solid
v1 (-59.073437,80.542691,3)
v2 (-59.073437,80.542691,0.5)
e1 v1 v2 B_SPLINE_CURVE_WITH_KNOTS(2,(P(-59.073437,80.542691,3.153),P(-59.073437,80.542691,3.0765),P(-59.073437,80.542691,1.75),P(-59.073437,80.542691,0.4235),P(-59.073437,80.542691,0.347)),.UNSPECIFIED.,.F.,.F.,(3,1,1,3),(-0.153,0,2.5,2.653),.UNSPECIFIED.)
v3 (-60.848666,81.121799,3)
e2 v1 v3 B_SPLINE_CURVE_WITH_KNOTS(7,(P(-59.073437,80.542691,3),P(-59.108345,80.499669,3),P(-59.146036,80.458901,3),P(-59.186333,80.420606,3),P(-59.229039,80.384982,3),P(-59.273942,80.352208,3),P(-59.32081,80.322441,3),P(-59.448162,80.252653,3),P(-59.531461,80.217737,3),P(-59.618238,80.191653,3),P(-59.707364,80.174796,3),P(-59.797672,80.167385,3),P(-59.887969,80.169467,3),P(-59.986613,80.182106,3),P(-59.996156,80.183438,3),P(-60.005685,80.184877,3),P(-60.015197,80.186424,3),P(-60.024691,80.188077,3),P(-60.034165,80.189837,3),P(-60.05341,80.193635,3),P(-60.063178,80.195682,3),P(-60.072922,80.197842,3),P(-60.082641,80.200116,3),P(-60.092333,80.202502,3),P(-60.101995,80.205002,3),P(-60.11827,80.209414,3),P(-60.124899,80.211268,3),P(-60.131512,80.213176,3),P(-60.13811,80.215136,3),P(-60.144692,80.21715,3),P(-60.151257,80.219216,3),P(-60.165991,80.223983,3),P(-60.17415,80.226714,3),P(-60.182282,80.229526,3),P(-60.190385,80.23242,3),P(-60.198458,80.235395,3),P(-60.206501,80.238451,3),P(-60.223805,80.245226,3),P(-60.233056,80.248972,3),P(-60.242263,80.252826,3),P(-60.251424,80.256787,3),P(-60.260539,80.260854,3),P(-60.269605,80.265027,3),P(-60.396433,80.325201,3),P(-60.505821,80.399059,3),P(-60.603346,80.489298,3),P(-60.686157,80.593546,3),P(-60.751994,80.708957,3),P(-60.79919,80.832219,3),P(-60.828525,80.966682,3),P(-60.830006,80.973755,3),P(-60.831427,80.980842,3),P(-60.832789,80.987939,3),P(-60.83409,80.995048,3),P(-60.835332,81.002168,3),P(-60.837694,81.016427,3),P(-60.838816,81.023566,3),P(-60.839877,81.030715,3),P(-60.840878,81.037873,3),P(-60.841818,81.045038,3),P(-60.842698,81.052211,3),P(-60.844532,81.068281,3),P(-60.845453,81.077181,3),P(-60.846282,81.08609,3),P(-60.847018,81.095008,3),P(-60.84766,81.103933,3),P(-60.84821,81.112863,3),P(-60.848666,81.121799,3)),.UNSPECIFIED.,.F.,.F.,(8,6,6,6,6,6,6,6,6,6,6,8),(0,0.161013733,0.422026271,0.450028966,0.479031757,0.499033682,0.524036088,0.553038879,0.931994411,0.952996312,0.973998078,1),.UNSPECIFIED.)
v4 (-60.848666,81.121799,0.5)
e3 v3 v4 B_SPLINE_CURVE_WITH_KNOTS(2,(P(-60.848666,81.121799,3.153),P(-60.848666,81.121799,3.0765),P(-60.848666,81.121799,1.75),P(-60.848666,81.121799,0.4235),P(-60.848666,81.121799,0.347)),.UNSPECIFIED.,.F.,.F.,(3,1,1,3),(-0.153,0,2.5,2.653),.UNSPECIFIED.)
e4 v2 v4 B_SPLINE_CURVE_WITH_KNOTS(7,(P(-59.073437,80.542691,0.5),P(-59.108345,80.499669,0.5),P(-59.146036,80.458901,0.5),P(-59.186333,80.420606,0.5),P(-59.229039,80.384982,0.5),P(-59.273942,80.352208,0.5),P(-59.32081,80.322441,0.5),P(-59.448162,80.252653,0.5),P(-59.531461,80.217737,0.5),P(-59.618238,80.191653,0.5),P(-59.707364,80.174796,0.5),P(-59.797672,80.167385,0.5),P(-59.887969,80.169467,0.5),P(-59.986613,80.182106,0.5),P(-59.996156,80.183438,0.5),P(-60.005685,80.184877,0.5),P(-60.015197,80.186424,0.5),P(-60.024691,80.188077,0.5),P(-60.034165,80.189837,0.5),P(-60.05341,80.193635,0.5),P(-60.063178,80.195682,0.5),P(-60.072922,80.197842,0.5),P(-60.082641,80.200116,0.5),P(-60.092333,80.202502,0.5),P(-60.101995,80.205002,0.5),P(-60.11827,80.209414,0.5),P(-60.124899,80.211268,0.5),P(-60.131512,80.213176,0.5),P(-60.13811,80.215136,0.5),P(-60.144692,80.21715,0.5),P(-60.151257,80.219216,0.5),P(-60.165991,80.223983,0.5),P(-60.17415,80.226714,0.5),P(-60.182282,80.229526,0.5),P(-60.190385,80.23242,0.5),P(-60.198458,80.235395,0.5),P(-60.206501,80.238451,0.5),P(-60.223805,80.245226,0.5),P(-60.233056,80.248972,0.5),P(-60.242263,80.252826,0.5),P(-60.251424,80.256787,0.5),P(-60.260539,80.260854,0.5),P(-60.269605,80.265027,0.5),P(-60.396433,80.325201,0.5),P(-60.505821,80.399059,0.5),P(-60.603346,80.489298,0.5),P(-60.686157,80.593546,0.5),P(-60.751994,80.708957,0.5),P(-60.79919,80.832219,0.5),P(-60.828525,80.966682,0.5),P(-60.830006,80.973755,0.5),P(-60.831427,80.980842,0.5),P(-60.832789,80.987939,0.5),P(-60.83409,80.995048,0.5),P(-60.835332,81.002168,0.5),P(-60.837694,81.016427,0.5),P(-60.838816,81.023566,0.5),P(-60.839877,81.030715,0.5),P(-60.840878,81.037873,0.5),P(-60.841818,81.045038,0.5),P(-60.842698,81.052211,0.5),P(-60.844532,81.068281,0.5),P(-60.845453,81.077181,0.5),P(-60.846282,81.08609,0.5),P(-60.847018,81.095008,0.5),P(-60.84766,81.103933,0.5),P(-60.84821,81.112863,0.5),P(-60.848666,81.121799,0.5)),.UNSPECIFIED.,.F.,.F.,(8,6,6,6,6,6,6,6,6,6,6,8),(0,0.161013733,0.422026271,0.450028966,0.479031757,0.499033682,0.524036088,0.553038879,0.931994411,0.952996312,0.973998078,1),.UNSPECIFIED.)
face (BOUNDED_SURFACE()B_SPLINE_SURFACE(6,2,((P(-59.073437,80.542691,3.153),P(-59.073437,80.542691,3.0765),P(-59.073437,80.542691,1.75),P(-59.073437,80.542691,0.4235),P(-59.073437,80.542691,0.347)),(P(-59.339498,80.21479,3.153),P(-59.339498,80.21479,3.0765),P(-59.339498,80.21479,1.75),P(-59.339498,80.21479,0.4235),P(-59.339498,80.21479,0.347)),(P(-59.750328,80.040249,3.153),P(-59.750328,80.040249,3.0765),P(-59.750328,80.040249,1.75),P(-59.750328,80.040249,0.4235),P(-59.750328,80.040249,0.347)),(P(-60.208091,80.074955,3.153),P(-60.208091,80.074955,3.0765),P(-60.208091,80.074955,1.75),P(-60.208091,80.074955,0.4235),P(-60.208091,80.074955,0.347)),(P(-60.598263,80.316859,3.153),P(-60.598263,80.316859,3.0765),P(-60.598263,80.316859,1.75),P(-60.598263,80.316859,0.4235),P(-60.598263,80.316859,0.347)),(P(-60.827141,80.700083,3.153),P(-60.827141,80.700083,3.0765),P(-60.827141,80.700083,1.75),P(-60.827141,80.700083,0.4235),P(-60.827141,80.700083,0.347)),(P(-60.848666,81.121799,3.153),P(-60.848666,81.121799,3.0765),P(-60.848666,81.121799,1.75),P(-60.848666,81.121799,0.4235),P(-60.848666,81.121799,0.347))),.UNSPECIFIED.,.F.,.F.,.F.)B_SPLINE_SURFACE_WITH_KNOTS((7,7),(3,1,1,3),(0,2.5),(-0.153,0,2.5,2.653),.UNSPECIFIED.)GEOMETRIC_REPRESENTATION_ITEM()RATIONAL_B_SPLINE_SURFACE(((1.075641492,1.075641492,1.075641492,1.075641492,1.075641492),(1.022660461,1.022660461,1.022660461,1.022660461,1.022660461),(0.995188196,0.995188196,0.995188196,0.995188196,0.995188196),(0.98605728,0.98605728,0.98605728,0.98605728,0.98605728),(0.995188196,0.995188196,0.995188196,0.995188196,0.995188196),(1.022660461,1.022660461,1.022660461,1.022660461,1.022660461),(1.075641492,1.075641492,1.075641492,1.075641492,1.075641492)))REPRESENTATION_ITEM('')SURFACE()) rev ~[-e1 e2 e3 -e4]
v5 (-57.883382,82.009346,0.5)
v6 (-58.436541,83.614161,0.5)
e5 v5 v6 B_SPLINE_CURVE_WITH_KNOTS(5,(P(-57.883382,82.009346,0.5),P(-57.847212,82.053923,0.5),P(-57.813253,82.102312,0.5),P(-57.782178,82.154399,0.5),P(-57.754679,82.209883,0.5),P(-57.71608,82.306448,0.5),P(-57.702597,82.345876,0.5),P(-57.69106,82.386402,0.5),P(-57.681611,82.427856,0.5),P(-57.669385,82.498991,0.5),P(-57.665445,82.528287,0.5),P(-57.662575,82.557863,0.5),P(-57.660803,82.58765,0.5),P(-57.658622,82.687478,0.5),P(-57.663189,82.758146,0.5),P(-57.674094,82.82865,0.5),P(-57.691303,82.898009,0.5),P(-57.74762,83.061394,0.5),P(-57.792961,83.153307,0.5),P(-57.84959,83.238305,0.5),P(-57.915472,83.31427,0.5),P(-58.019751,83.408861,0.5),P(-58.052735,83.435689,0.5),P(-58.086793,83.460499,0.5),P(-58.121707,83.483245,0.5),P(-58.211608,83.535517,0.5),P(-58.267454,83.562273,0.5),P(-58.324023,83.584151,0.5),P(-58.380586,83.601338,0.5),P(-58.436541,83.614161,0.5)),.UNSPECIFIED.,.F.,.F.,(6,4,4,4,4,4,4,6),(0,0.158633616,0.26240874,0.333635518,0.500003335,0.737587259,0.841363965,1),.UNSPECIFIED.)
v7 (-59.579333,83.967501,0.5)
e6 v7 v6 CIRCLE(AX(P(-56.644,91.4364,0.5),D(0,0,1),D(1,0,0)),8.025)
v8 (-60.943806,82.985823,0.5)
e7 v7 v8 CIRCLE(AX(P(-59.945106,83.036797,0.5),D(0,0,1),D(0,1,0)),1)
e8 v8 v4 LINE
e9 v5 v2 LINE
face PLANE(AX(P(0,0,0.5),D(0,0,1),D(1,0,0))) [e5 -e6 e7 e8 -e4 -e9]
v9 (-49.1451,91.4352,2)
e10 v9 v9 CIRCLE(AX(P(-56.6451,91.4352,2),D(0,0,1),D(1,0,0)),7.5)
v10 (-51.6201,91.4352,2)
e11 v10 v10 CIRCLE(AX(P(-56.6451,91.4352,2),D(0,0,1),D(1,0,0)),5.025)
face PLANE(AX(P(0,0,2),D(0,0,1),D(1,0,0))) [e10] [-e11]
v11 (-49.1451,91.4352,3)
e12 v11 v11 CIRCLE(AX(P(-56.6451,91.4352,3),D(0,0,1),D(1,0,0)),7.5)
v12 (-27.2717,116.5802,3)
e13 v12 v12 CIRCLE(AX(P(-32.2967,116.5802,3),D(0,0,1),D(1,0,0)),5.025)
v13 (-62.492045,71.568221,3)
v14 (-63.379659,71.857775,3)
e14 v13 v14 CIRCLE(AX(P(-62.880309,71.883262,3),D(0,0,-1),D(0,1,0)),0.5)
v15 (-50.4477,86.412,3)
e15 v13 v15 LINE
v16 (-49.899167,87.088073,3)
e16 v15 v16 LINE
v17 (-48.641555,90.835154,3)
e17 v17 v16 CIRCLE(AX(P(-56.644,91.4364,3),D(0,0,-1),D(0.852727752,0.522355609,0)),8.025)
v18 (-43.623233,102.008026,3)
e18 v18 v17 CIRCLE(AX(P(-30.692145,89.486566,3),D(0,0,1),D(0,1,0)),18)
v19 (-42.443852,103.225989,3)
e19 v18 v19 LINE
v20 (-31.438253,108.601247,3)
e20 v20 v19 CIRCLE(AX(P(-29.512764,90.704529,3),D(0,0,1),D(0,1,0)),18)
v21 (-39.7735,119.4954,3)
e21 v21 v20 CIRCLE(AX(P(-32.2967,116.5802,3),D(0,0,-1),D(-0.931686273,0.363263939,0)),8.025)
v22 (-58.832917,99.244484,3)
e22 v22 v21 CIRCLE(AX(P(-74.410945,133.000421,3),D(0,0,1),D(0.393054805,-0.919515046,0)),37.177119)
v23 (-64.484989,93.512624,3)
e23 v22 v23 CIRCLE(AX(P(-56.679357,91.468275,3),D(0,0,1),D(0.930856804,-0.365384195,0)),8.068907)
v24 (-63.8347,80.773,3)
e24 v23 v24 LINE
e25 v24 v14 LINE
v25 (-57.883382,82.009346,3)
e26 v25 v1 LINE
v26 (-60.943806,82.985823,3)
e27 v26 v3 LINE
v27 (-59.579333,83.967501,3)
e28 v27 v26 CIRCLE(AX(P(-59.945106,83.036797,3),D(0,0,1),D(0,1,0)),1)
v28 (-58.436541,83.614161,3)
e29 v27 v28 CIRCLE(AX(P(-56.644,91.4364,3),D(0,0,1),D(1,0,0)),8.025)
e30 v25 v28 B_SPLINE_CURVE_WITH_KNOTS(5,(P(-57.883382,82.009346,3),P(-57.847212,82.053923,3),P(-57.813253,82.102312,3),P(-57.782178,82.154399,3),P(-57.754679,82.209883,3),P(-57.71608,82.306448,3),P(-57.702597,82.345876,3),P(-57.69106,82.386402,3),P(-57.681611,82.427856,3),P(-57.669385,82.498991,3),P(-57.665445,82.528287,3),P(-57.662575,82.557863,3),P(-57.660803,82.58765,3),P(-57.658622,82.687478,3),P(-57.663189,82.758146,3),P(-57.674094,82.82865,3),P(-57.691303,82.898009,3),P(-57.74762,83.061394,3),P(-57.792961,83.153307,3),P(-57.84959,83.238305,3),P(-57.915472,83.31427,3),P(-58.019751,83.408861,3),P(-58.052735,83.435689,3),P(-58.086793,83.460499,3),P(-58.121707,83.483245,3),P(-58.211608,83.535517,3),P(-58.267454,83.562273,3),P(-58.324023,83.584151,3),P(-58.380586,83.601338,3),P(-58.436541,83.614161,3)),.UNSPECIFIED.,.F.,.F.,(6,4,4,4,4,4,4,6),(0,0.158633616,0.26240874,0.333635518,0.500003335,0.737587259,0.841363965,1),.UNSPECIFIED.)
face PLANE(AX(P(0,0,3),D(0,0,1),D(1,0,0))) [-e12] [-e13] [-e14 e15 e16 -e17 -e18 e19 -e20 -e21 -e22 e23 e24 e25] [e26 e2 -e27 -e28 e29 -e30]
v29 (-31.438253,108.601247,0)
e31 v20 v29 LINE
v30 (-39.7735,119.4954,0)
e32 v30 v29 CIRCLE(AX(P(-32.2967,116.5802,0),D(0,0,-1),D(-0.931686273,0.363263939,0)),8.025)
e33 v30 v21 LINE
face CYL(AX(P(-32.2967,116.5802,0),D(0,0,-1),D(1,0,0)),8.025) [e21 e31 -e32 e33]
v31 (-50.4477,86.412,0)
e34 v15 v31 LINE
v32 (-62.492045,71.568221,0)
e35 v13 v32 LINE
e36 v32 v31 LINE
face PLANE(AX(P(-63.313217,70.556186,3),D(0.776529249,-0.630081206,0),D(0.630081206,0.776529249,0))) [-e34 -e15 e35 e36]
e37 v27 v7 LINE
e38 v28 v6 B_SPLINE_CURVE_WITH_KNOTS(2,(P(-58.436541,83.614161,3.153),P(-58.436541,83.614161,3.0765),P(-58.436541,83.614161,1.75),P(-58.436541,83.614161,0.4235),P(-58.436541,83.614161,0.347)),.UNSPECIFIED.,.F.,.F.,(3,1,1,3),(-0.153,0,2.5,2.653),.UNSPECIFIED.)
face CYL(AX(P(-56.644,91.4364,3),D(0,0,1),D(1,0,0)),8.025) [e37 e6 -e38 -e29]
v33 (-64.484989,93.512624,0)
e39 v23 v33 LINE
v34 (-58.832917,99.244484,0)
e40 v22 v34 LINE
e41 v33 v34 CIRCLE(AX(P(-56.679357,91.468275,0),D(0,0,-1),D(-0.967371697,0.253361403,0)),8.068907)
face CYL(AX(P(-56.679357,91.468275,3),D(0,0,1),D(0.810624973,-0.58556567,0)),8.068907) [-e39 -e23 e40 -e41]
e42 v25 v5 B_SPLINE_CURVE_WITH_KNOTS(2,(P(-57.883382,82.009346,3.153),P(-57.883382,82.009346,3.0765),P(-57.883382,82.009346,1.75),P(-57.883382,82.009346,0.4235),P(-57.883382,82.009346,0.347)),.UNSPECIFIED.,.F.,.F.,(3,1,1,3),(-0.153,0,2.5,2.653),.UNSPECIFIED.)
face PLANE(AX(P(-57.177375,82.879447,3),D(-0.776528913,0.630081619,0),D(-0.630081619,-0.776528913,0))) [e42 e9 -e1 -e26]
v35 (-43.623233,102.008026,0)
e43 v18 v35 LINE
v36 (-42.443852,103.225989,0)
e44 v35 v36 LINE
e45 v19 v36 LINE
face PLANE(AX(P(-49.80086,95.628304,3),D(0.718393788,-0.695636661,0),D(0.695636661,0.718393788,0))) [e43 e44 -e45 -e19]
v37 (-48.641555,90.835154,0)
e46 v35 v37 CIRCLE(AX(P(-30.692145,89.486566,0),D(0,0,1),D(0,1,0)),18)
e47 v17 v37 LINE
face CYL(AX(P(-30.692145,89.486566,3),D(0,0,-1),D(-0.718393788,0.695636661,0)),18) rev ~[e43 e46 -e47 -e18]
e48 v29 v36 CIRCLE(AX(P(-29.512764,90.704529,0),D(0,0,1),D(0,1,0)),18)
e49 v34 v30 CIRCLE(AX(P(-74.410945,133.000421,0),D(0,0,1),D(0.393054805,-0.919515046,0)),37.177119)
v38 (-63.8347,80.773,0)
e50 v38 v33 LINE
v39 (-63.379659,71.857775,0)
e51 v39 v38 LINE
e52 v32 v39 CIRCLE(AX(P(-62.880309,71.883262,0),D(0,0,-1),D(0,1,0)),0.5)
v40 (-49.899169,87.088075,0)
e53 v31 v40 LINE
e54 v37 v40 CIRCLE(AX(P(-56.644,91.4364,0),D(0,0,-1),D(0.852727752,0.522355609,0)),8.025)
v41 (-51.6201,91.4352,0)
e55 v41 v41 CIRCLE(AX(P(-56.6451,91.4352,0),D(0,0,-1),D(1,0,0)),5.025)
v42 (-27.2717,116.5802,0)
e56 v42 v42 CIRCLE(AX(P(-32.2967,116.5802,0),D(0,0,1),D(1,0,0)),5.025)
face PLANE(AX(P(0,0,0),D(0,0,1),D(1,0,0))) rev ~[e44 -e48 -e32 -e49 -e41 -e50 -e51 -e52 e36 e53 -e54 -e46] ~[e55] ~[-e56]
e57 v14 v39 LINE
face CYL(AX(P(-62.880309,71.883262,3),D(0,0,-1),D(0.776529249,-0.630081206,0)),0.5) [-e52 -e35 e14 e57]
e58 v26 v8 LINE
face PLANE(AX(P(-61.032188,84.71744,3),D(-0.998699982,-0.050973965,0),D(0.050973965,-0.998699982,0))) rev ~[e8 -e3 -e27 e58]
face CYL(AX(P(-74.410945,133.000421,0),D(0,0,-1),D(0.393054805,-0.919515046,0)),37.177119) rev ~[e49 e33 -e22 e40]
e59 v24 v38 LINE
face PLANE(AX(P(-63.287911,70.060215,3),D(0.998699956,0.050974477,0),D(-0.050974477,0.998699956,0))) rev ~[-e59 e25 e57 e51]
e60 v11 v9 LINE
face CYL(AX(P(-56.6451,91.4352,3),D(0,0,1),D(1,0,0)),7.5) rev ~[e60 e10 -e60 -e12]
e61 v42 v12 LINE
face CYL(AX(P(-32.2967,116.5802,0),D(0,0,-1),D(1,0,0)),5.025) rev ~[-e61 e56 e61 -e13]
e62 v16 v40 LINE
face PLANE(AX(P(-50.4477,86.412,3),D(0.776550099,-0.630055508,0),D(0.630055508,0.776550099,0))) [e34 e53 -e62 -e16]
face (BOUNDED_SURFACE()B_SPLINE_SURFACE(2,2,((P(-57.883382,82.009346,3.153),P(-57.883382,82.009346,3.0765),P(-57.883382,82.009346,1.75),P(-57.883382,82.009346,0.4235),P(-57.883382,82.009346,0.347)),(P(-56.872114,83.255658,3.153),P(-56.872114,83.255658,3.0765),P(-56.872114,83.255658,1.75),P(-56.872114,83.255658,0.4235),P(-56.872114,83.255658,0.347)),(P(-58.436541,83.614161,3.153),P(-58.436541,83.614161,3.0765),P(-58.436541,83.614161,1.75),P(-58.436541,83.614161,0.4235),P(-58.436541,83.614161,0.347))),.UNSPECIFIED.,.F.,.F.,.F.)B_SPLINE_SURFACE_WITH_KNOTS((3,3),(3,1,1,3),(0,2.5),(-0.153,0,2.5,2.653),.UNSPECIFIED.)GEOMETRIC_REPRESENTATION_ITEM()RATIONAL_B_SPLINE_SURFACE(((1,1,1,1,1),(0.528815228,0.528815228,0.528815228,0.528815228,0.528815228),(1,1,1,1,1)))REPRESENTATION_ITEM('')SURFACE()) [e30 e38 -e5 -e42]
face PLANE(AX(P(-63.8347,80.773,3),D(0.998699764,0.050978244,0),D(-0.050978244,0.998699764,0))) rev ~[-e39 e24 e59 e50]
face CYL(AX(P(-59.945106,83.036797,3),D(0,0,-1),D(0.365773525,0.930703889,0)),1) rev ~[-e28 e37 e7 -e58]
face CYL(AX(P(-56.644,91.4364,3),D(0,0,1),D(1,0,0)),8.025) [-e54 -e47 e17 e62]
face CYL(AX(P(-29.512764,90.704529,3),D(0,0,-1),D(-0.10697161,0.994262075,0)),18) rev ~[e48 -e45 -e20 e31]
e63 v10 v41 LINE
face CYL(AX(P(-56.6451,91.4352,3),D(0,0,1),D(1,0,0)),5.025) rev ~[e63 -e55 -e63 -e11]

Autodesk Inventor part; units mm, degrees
ref_plane "YZ Plane" through (0, 0, 0) normal (1, 0, 0) x (0, 1, 0)
ref_plane "XZ Plane" through (0, 0, 0) normal (0, 1, 0) x (-1, 0, 0)
ref_plane "XY Plane" through (0, 0, 0) normal (0, 0, 1) x (1, 0, 0)
sketch "スケッチ2" plane through (0, 0, 0) normal (0, 0, 1) x (1, 0, 0)
  circle A0 centre (-56.644, 91.4364) radius 8.025
  circle A1 centre (-56.644, 91.4364) radius 5.025
  arc A2 (-29.1424, 109.2011) -> (-49.1672, 88.5212) centre (-14.5297, 75.0161) ccw
  arc A3 (-59.7983, 98.8155) -> (-39.7735, 119.4954) centre (-74.411, 133.0005) ccw
  circle A4 centre (-32.2967, 116.5802) radius 8.025
  circle A5 centre (-32.2967, 116.5802) radius 5.025
  line L0 (-50.8789, 85.8539) -> (-64.3562, 71.9357)
  line L1 (-64.3562, 71.9357) -> (-64.668, 91.3073)
  line L2 (-56.644, 91.4364) -> (-32.2967, 116.5802) construction
  point P0 (0, 0)
  point P1 (0, 0)
  dimension "d5" = 45
extrude "押し出し2" add sketch "スケッチ2" along normal blind 3
fillet "フィレット2" radius 0.5 1 edges at (-64.3562, 71.9357, 1.5)
sketch "スケッチ3" plane through (0, 0, 3) normal (0, 0, 1) x (1, 0, 0)
  line L0 (-63.5165, 72.8029) -> (-50.8789, 85.8539) projected
  arc A0 (-64.3756, 73.1427) -> (-63.5165, 72.8029) centre (-63.8757, 73.1507) ccw projected
  line L1 (-64.668, 91.3073) -> (-64.3756, 73.1427) projected
  arc A1 (-59.7983, 98.8155) -> (-64.668, 91.3073) centre (-56.644, 91.4364) ccw projected
  circle A2 centre (-56.644, 91.4364) radius 5.025 projected
  arc A3 (-50.8789, 85.8539) -> (-49.1672, 88.5212) centre (-56.644, 91.4364) ccw projected
  line L2 (-64.2129, 94.1033) -> (-63.8416, 71.0319)
  point P0 (0, 0)
  point P1 (-63.8676, 72.6508)
  dimension "d9" = 0.5
extrude "押し出し3" cut sketch "スケッチ3" against normal through all
fillet "フィレット3" radius 1 1 edges at (-63.8676, 72.6508, 1.5)
sketch "スケッチ4" plane through (0, 0, 3) normal (0, 0, 1) x (1, 0, 0)
  circle A0 centre (-56.644, 91.4364) radius 5.025 projected
  circle A1 centre (-32.2967, 116.5802) radius 5.025 projected
  arc A2 (-50.8789, 85.8539) -> (-49.1672, 88.5212) centre (-56.644, 91.4364) ccw projected
  line L0 (-50.8789, 85.8539) -> (-62.1849, 74.178) projected
  arc A3 (-63.9031, 74.8576) -> (-62.1849, 74.178) centre (-62.9033, 74.8737) ccw projected
  line L1 (-63.9031, 74.8576) -> (-64.2129, 94.1033) projected
  arc A4 (-59.7983, 98.8155) -> (-64.2129, 94.1033) centre (-56.644, 91.4364) ccw projected
  arc A5 (-59.7983, 98.8155) -> (-39.7735, 119.4954) centre (-74.411, 133.0005) ccw projected
  arc A6 (-29.1424, 109.2011) -> (-39.7735, 119.4954) centre (-32.2967, 116.5802) ccw projected
  arc A7 (-29.1424, 109.2011) -> (-49.1672, 88.5212) centre (-14.5297, 75.0161) ccw projected
  point P0 (0, 0)
sketch "スケッチ5" plane through (0, 0, 3) normal (0, 0, 1) x (1, 0, 0)
  circle A0 centre (-56.6451, 91.4352) radius 5.025
  circle A1 centre (-32.2979, 116.579) radius 5.025
  arc A2 (-50.2754, 86.5539) -> (-49.1683, 88.52) centre (-56.6451, 91.4352) ccw
  line L0 (-53.8399, 82.796) -> (-62.186, 74.1768)
  arc A3 (-63.9043, 74.8564) -> (-63.4923, 74.0635) centre (-62.9044, 74.8725) ccw
  line L1 (-63.9043, 74.8564) -> (-64.1215, 88.3503)
  arc A4 (-59.7994, 98.8143) -> (-64.4699, 93.2166) centre (-56.6451, 91.4352) ccw
  arc A5 (-59.7994, 98.8143) -> (-39.7746, 119.4942) centre (-74.4122, 132.9993) ccw
  arc A6 (-29.1436, 109.1999) -> (-39.7746, 119.4942) centre (-32.2979, 116.579) ccw
  arc A7 (-29.1436, 109.1999) -> (-49.1683, 88.52) centre (-14.5308, 75.0149) ccw
  line L2 (-83.3619, 46.2586) -> (-83.0117, 46.8656)
  arc A8 (-83.0117, 46.8656) -> (-84.2091, 48.3089) centre (-83.8778, 47.3654) ccw
  arc A9 (-84.8038, 48.1181) -> (-84.2091, 48.3089) centre (-88.0269, 59.1832) ccw
  arc A10 (-84.8038, 48.1181) -> (-85.306, 46.5345) centre (-84.5242, 47.158) ccw
  arc A11 (-85.0521, 46.1918) -> (-85.306, 46.5345) centre (-90.0169, 42.7785) ccw
  arc A12 (-85.0521, 46.1918) -> (-83.3619, 46.2586) centre (-84.2281, 46.7584) ccw
  arc A13 (-83.3002, 71.3425) -> (-83.1434, 69.6224) centre (-82.7197, 70.5282) ccw
  arc A14 (-76.5108, 59.6362) -> (-83.1434, 69.6224) centre (-88.0269, 59.1832) ccw
  arc A15 (-76.5108, 59.6362) -> (-74.7281, 59.0541) centre (-75.5116, 59.6755) ccw
  line L3 (-74.7281, 59.0541) -> (-66.7908, 69.0625)
  arc A16 (-66.7908, 69.0625) -> (-66.5756, 69.7348) centre (-67.5743, 69.6838) ccw
  line L4 (-66.5756, 69.7348) -> (-66.7153, 72.4721)
  arc A17 (-66.7153, 72.4721) -> (-67.8599, 73.4104) centre (-67.714, 72.4211) ccw
  arc A18 (-72.6132, 76.6262) -> (-67.8599, 73.4104) centre (-68.4798, 77.615) ccw
  arc A19 (-72.6132, 76.6262) -> (-73.9849, 77.3105) centre (-73.5858, 76.3936) ccw
  arc A20 (-73.9849, 77.3105) -> (-82.4826, 71.9828) centre (-60.5442, 46.4316) ccw
  arc A21 (-83.3002, 71.3425) -> (-82.4826, 71.9828) centre (-89.9903, 80.7269) ccw
  arc A22 (-110.8315, 31.539) -> (-109.4939, 30.5036) centre (-109.8361, 31.4432) ccw
  arc A23 (-101.7829, 26.9363) -> (-109.4939, 30.5036) centre (-107.4323, 24.8423) ccw
  arc A24 (-101.7829, 26.9363) -> (-100.1278, 26.5873) centre (-100.8452, 27.2839) ccw
  line L5 (-100.1278, 26.5873) -> (-91.546, 35.4257)
  arc A25 (-91.546, 35.4257) -> (-91.9436, 37.0698) centre (-92.2634, 36.1224) ccw
  arc A26 (-93.6931, 47.552) -> (-91.9436, 37.0698) centre (-90.0169, 42.7785) ccw
  arc A27 (-93.6931, 47.552) -> (-93.8022, 49.2096) centre (-94.3033, 48.3443) ccw
  arc A28 (-99.3351, 56.9581) -> (-93.8022, 49.2096) centre (-88.0269, 59.1832) ccw
  arc A29 (-99.3351, 56.9581) -> (-101.1863, 57.258) centre (-100.3162, 56.765) ccw
  line L6 (-101.1863, 57.258) -> (-106.2752, 48.2771)
  arc A30 (-106.2752, 48.2771) -> (-105.4755, 46.7866) centre (-105.4052, 47.7841) ccw
  arc A31 (-109.0024, 35.6122) -> (-105.4755, 46.7866) centre (-105.8991, 40.7765) ccw
  arc A32 (-109.0024, 35.6122) -> (-110.5128, 34.8508) centre (-109.5174, 34.755) ccw
  line L7 (-110.5128, 34.8508) -> (-110.8315, 31.539)
  circle A33 centre (-68.4798, 77.615) radius 1.25
  arc A34 (-64.1344, 80.7577) -> (-66.454, 82.6296) centre (-66.1318, 80.6557) ccw
  line L8 (-64.1344, 80.7577) -> (-63.5026, 68.3807)
  line L9 (-63.5026, 68.3807) -> (-76.8311, 51.5743)
  line L10 (-76.8311, 51.5743) -> (-83.9322, 39.2676)
  arc A35 (-84.9769, 37.8848) -> (-83.9322, 39.2676) centre (-90.0169, 42.7785) ccw
  line L11 (-84.9769, 37.8848) -> (-102.3922, 19.9486)
  arc A36 (-114.425, 25.5151) -> (-102.3922, 19.9486) centre (-107.4323, 24.8423) ccw
  line L12 (-114.425, 25.5151) -> (-112.8918, 41.4493)
  arc A37 (-112.0111, 44.2398) -> (-112.8918, 41.4493) centre (-105.8991, 40.7765) ccw
  line L13 (-112.0111, 44.2398) -> (-99.7723, 65.8386)
  arc A38 (-91.2432, 72.2945) -> (-99.7723, 65.8386) centre (-88.0269, 59.1832) ccw
  arc A39 (-91.2432, 72.2945) -> (-84.4369, 74.2589) centre (-89.9903, 80.7269) ccw
  arc A40 (-66.454, 82.6296) -> (-84.4369, 74.2589) centre (-60.5442, 46.4316) ccw
  circle A41 centre (-56.6793, 91.4683) radius 4
  circle A42 centre (-56.6793, 91.4683) radius 1.25
  circle A43 centre (-90.0169, 42.7785) radius 3.025
  circle A44 centre (-105.8991, 40.7765) radius 3.025
  circle A45 centre (-107.4323, 24.8423) radius 3.025
  circle A46 centre (-88.0269, 59.1832) radius 8.525
  circle A47 centre (-56.6793, 91.4683) radius 1.25
  line L14 (-32.2979, 116.579) -> (-56.6793, 91.4683)
  line L15 (-56.6793, 91.4683) -> (-88.0269, 59.1832)
  line L16 (-63.1972, 68.283) -> (-63.8347, 80.773)
  arc A48 (-63.8347, 80.773) -> (-66.5024, 82.9257) centre (-66.1318, 80.6557) ccw
  arc A49 (-66.5024, 82.9257) -> (-84.6323, 74.4865) centre (-60.5442, 46.4316) ccw
  arc A50 (-91.2565, 72.6) -> (-84.6323, 74.4865) centre (-89.9903, 80.7269) ccw
  arc A51 (-91.2565, 72.6) -> (-100.0334, 65.9865) centre (-88.0269, 59.1832) ccw
  line L17 (-100.0334, 65.9865) -> (-112.2721, 44.3877)
  arc A52 (-112.2721, 44.3877) -> (-113.1904, 41.4781) centre (-105.8991, 40.7765) ccw
  line L18 (-113.1904, 41.4781) -> (-114.7236, 25.5439)
  arc A53 (-114.7236, 25.5439) -> (-102.177, 19.7396) centre (-107.4323, 24.8423) ccw
  line L19 (-102.177, 19.7396) -> (-84.7616, 37.6758)
  arc A54 (-84.7616, 37.6758) -> (-83.6724, 39.1176) centre (-90.0169, 42.7785) ccw
  line L20 (-83.6724, 39.1176) -> (-76.5823, 51.4052)
  line L21 (-76.5823, 51.4052) -> (-63.1972, 68.283)
  arc A55 (-50.1385, 86.7434) -> (-64.1215, 88.3503) centre (-56.6793, 91.4683) ccw
  line L22 (-63.8347, 80.773) -> (-64.5039, 93.8831)
  line L23 (-76.8311, 51.5743) -> (-63.2204, 68.7366)
  circle A56 centre (-62.7886, 70.0857) radius 0.5
  line L24 (-62.3833, 69.7929) -> (-50.1385, 86.7434)
  line L25 (-63.5026, 68.3807) -> (-63.2204, 68.7366)
  line L26 (-62.3968, 69.775) -> (-61.9303, 70.3632)
  point P0 (0, 0)
  point P1 (0, 0)
  point P2 (0, 0)
  point P3 (-64.214, 94.1021)
  point P4 (-63.996, 83.9328)
  point P5 (-64.0495, 83.8777)
  point P6 (-64.2363, 88.6401)
  point P7 (-64.1215, 88.3503)
  point P8 (-50.2754, 86.5539)
  point P9 (-63.2879, 70.0602)
  point P10 (-64.0754, 85.487)
  point P11 (-58.8289, 99.2457)
  point P12 (-49.1573, 88.5483)
  point P13 (-64.012, 81.5482)
  point P14 (-64.485, 93.5124)
  dimension "d13" = 0.3
  dimension "d14" = 1
extrude "押し出し4" cut sketch "スケッチ5" against normal blind 3 contours L22 A48 L1 L15 | L16 A3 L8 L1 A48 | L8 A3 L1
extrude "押し出し5" cut sketch "スケッチ5" against normal blind 3 contours A0 L15 A41 L14 | A0 L14 A55 L24 A56 L16 L22 L15 | L14 A41 L15 A0 | A0 L15 L22 L1 A55 A4 A5 L14 | L14 A42 L15 A41 | A41 L15 A42 L14 | L22 A48 L1 L15 | L15 L1 L22 | A2 L24 A55 | A5 A4 L22 A55 | L14 L15 A42 | A42 L15 L14 | L22 A55 L1 | L22 A55 | A56
extrude "押し出し6" add sketch "スケッチ5" against normal blind 3 contours A0 L14 A55 L24 A56 L16 L22 L15 | A0 L15 L22 L1 A55 A4 A5 L14 | A2 L24 A55 | A5 A4 L22 A55 | L22 A55 L1 | A56
sketch "スケッチ6" plane through (0, 0, 3) normal (0, 0, 1) x (1, 0, 0)
  arc A0 (-58.8326, 99.2446) -> (-39.7735, 119.4954) centre (-74.411, 133.0005) ccw projected
  arc A1 (-29.1424, 109.2011) -> (-39.7735, 119.4954) centre (-32.2967, 116.5802) ccw projected
  arc A2 (-29.1424, 109.2011) -> (-49.1672, 88.5212) centre (-14.5297, 75.0161) ccw projected
  circle A3 centre (-32.2967, 116.5802) radius 5.025 projected
  circle A4 centre (-56.6451, 91.4352) radius 5.025 projected
  arc A5 (-58.8326, 99.2446) -> (-64.485, 93.5124) centre (-56.6793, 91.4683) ccw projected
  arc A6 (-50.2787, 86.5493) -> (-49.1672, 88.5212) centre (-56.644, 91.4364) ccw projected
  line L0 (-50.2787, 86.5493) -> (-62.3833, 69.7929) projected
  arc A7 (-63.2879, 70.0602) -> (-62.3833, 69.7929) centre (-62.7886, 70.0857) ccw projected
  line L1 (-63.2879, 70.0602) -> (-64.485, 93.5124) projected
  point P0 (0, 0)
sketch "スケッチ7" plane through (0, 0, 3) normal (0, 0, 1) x (1, 0, 0)
  arc A0 (-58.8326, 99.2446) -> (-39.7735, 119.4954) centre (-74.411, 133.0005) ccw projected
  arc A1 (-29.1424, 109.2011) -> (-39.7735, 119.4954) centre (-32.2967, 116.5802) ccw projected
  arc A2 (-29.1424, 109.2011) -> (-49.1672, 88.5212) centre (-14.5297, 75.0161) ccw projected
  circle A3 centre (-32.2967, 116.5802) radius 5.025 projected
  circle A4 centre (-56.6451, 91.4352) radius 5.025 projected
  arc A5 (-58.8326, 99.2446) -> (-64.485, 93.5124) centre (-56.6793, 91.4683) ccw projected
  arc A6 (-50.2787, 86.5493) -> (-49.1672, 88.5212) centre (-56.644, 91.4364) ccw projected
  line L0 (-50.2787, 86.5493) -> (-62.3833, 69.7929) projected
  arc A7 (-63.2879, 70.0602) -> (-62.3833, 69.7929) centre (-62.7886, 70.0857) ccw projected
  line L1 (-63.2879, 70.0602) -> (-64.485, 93.5124) projected
  point P0 (0, 0)
sketch "スケッチ8" plane through (0, 0, 3) normal (0, 0, 1) x (1, 0, 0)
  circle A0 centre (-56.6451, 91.4352) radius 5.025 projected
  arc A1 (-58.8326, 99.2446) -> (-64.485, 93.5124) centre (-56.6793, 91.4683) ccw projected
  arc A2 (-58.8326, 99.2446) -> (-39.7735, 119.4954) centre (-74.411, 133.0005) ccw projected
  arc A3 (-29.1424, 109.2011) -> (-39.7735, 119.4954) centre (-32.2967, 116.5802) ccw projected
  arc A4 (-29.1424, 109.2011) -> (-49.1672, 88.5212) centre (-14.5297, 75.0161) ccw projected
  arc A5 (-50.2787, 86.5493) -> (-49.1672, 88.5212) centre (-56.644, 91.4364) ccw projected
  line L0 (-50.2787, 86.5493) -> (-62.3833, 69.7929) projected
  arc A6 (-63.2879, 70.0602) -> (-62.3833, 69.7929) centre (-62.7886, 70.0857) ccw projected
  line L1 (-63.2879, 70.0602) -> (-64.485, 93.5124) projected
  circle A7 centre (-32.2967, 116.5802) radius 5.025 projected
  line L2 (-56.644, 91.4364) -> (-32.2967, 116.5802)
  line L3 (-29.5619, 125.8734) -> (-71.0195, 83.0595)
  arc A8 (-58.8326, 99.2446) -> (-39.7735, 119.4954) centre (-74.411, 133.0005) ccw projected
  line L4 (-56.644, 91.4364) -> (-32.2967, 116.5802) construction
  line L5 (-55.2072, 90.0451) -> (-30.8599, 115.1889)
  line L6 (-33.7335, 117.9715) -> (-58.0808, 92.8277)
  arc A9 (-58.0808, 92.8277) -> (-55.2072, 90.0451) centre (-56.644, 91.4364) ccw
  arc A10 (-30.8599, 115.1889) -> (-33.7335, 117.9715) centre (-32.2967, 116.5802) ccw
  arc A11 (-29.1424, 109.2011) -> (-49.1672, 88.5212) centre (-14.5297, 75.0161) ccw projected
  circle A12 centre (-56.644, 91.4364) radius 8.025
  circle A13 centre (-32.2967, 116.5802) radius 8.025
  point P0 (0, 0)
  point P1 (-44.4704, 104.0083)
  point P2 (-36.2663, 109.6057)
  point P3 (-49.8009, 95.6283)
  dimension "d21" = 4.5
  dimension "d22" = 4
extrude "押し出し7" cut sketch "スケッチ8" against normal blind 10 contours L5 A13 A4 A12
fillet "フィレット4" radius 18 2 edges at (-49.8009, 95.6283, 1.5) (-36.2663, 109.6057, 1.5)
sketch "スケッチ9" plane through (0, 0, 3) normal (0, 0, 1) x (1, 0, 0)
  circle A0 centre (-56.6451, 91.4352) radius 5.025 projected
  arc A1 (-58.8326, 99.2446) -> (-64.485, 93.5124) centre (-56.6793, 91.4683) ccw projected
  arc A2 (-58.8326, 99.2446) -> (-39.7735, 119.4954) centre (-74.411, 133.0005) ccw projected
  arc A3 (-31.4383, 108.6012) -> (-39.7735, 119.4954) centre (-32.2967, 116.5802) ccw projected
  arc A4 (-31.4383, 108.6012) -> (-42.4439, 103.226) centre (-29.5128, 90.7045) ccw projected
  line L0 (-42.4439, 103.226) -> (-43.6232, 102.0081) projected
  arc A5 (-43.6232, 102.0081) -> (-48.6415, 90.8352) centre (-30.6921, 89.4866) ccw projected
  arc A6 (-50.2787, 86.5493) -> (-48.6415, 90.8352) centre (-56.644, 91.4364) ccw projected
  line L1 (-50.2787, 86.5493) -> (-62.3833, 69.7929) projected
  arc A7 (-63.2879, 70.0602) -> (-62.3833, 69.7929) centre (-62.7886, 70.0857) ccw projected
  line L2 (-63.2879, 70.0602) -> (-64.485, 93.5124) projected
  circle A8 centre (-32.2967, 116.5802) radius 5.025 projected
  line L3 (-60.6541, 77.3098) -> (-52.682, 88.3456)
  arc A9 (-52.682, 88.3456) -> (-51.6331, 91.0599) centre (-56.644, 91.4364) ccw
  arc A10 (-45.7784, 104.095) -> (-51.6331, 91.0599) centre (-30.6921, 89.4866) ccw
  line L4 (-45.7784, 104.095) -> (-44.5991, 105.3129)
  arc A11 (-31.7592, 111.584) -> (-44.5991, 105.3129) centre (-29.5128, 90.7045) ccw
  arc A12 (-31.7592, 111.584) -> (-36.9785, 118.4056) centre (-32.2967, 116.5802) ccw
  arc A13 (-57.8274, 96.4055) -> (-36.9785, 118.4056) centre (-74.411, 133.0005) ccw
  arc A14 (-57.8274, 96.4055) -> (-61.4624, 93.1463) centre (-56.6793, 91.4683) ccw
  line L5 (-61.4624, 93.1463) -> (-60.6541, 77.3098)
  circle A15 centre (-56.644, 91.4364) radius 8.025
  point P0 (0, 0)
  point P1 (-56.239, 83.4216)
  point P2 (-61.0322, 84.7174)
  dimension "d26" = 3
extrude "押し出し8" cut sketch "スケッチ9" against normal blind 2.5 contours L3 L5 A15
fillet "フィレット5" radius 1 3 edges at (-61.0322, 84.7174, 1.75) (-56.239, 83.4216, 1.75) (-60.6541, 77.3098, 1.75)
sketch "スケッチ10" plane through (0, 0, 3) normal (0, 0, 1) x (1, 0, 0)
  line L0 (-60.799, 80.1484) -> (-60.9438, 82.9858) projected
  arc A0 (-59.5793, 83.9675) -> (-60.9438, 82.9858) centre (-59.9451, 83.0368) ccw projected
  arc A1 (-59.5793, 83.9675) -> (-57.9522, 83.5187) centre (-56.644, 91.4364) ccw projected
  arc A2 (-57.3045, 81.9465) -> (-57.9522, 83.5187) centre (-58.1152, 82.5321) ccw projected
  line L1 (-57.3045, 81.9465) -> (-58.9896, 79.6138) projected
  arc A3 (-60.799, 80.1484) -> (-58.9896, 79.6138) centre (-59.8003, 80.1994) ccw projected
  arc A4 (-31.4383, 108.6012) -> (-39.7735, 119.4954) centre (-32.2967, 116.5802) ccw projected
  arc A5 (-58.8326, 99.2446) -> (-39.7735, 119.4954) centre (-74.411, 133.0005) ccw projected
  arc A6 (-58.8326, 99.2446) -> (-64.485, 93.5124) centre (-56.6793, 91.4683) ccw projected
  line L2 (-64.485, 93.5124) -> (-63.2879, 70.0602) projected
  arc A7 (-63.2879, 70.0602) -> (-62.3833, 69.7929) centre (-62.7886, 70.0857) ccw projected
  line L3 (-62.3833, 69.7929) -> (-50.2787, 86.5493) projected
  arc A8 (-50.2787, 86.5493) -> (-48.6415, 90.8352) centre (-56.644, 91.4364) ccw projected
  arc A9 (-43.6232, 102.0081) -> (-48.6415, 90.8352) centre (-30.6921, 89.4866) ccw projected
  line L4 (-43.6232, 102.0081) -> (-42.4439, 103.226) projected
  arc A10 (-31.4383, 108.6012) -> (-42.4439, 103.226) centre (-29.5128, 90.7045) ccw projected
  circle A11 centre (-56.6451, 91.4352) radius 5.025 projected
  circle A12 centre (-32.2967, 116.5802) radius 5.025 projected
  circle A13 centre (-56.6451, 91.4352) radius 8.025
  point P0 (0, 0)
  dimension "d31" = 16.05
sketch "スケッチ11" plane through (0, 0, 3) normal (0, 0, 1) x (1, 0, 0)
  line L0 (-61.9172, 97.5483) -> (-93.2211, 70.5805)
  arc A0 (-92.0093, 71.0583) -> (-93.2211, 70.5805) centre (-88.0269, 59.1832) ccw
  line L1 (-87.2798, 72.6443) -> (-92.0093, 71.0583)
  arc A1 (-87.2798, 72.6443) -> (-84.4369, 74.259) centre (-89.9903, 80.727) ccw
  arc A2 (-66.4541, 82.6296) -> (-84.4369, 74.259) centre (-60.5442, 46.4317) ccw
  arc A3 (-64.1344, 80.7577) -> (-66.4541, 82.6296) centre (-66.1318, 80.6558) ccw
  line L2 (-63.5959, 70.2078) -> (-64.1344, 80.7577)
  line L3 (-63.5959, 70.2078) -> (-50.4477, 86.412)
  arc A4 (-50.4477, 86.412) -> (-61.9172, 97.5483) centre (-56.6794, 91.4684) ccw
  circle A5 centre (-56.6794, 91.4684) radius 4
  line L4 (-60.799, 80.1484) -> (-60.9438, 82.9858) projected
  arc A6 (-59.5793, 83.9675) -> (-60.9438, 82.9858) centre (-59.9451, 83.0368) ccw projected
  arc A7 (-59.5793, 83.9675) -> (-57.9522, 83.5187) centre (-56.644, 91.4364) ccw projected
  arc A8 (-57.3045, 81.9465) -> (-57.9522, 83.5187) centre (-58.1152, 82.5321) ccw projected
  line L5 (-57.3045, 81.9465) -> (-58.9896, 79.6138) projected
  arc A9 (-60.799, 80.1484) -> (-58.9896, 79.6138) centre (-59.8003, 80.1994) ccw projected
  arc A10 (-31.4383, 108.6012) -> (-39.7735, 119.4954) centre (-32.2967, 116.5802) ccw projected
  arc A11 (-58.8326, 99.2446) -> (-39.7735, 119.4954) centre (-74.411, 133.0005) ccw projected
  arc A12 (-58.8326, 99.2446) -> (-64.485, 93.5124) centre (-56.6793, 91.4683) ccw projected
  line L6 (-64.485, 93.5124) -> (-63.2879, 70.0602) projected
  arc A13 (-63.2879, 70.0602) -> (-62.3833, 69.7929) centre (-62.7886, 70.0857) ccw projected
  line L7 (-62.3833, 69.7929) -> (-50.2787, 86.5493) projected
  arc A14 (-50.2787, 86.5493) -> (-48.6415, 90.8352) centre (-56.644, 91.4364) ccw projected
  arc A15 (-43.6232, 102.0081) -> (-48.6415, 90.8352) centre (-30.6921, 89.4866) ccw projected
  line L8 (-43.6232, 102.0081) -> (-42.4439, 103.226) projected
  arc A16 (-31.4383, 108.6012) -> (-42.4439, 103.226) centre (-29.5128, 90.7045) ccw projected
  circle A17 centre (-56.6451, 91.4352) radius 5.025 projected
  circle A18 centre (-32.2967, 116.5802) radius 5.025 projected
  line L9 (-50.4477, 86.412) -> (-49.8116, 87.196)
  line L10 (-62.3833, 69.7929) -> (-50.2787, 86.5493) projected
  point P0 (0, 0)
  point P1 (0, 0)
  point P2 (-49.8994, 87.0877)
  point P3 (-63.3132, 70.5562)
extrude "押し出し9" cut sketch "スケッチ11" against normal blind 10 contours L9 A14 L7 A13 L6 L3
fillet "フィレット6" radius 0.5 1 edges at (-63.3132, 70.5562, 1.5)
sketch "スケッチ12" plane through (0, 0, 3) normal (0, 0, 1) x (1, 0, 0)
  line L0 (-60.799, 80.1484) -> (-60.9438, 82.9858) projected
  arc A0 (-59.5793, 83.9675) -> (-60.9438, 82.9858) centre (-59.9451, 83.0368) ccw projected
  arc A1 (-59.5793, 83.9675) -> (-57.9522, 83.5187) centre (-56.644, 91.4364) ccw projected
  arc A2 (-57.3045, 81.9465) -> (-57.9522, 83.5187) centre (-58.1152, 82.5321) ccw projected
  line L1 (-57.3045, 81.9465) -> (-58.9896, 79.6138) projected
  arc A3 (-60.799, 80.1484) -> (-58.9896, 79.6138) centre (-59.8003, 80.1994) ccw projected
  arc A4 (-63.3797, 71.8578) -> (-62.4921, 71.5682) centre (-62.8803, 71.8833) ccw projected
  line L2 (-62.4921, 71.5682) -> (-49.8994, 87.0877) projected
  arc A5 (-49.8994, 87.0877) -> (-48.6415, 90.8352) centre (-56.644, 91.4364) ccw projected
  arc A6 (-43.6232, 102.0081) -> (-48.6415, 90.8352) centre (-30.6921, 89.4866) ccw projected
  line L3 (-43.6232, 102.0081) -> (-42.4439, 103.226) projected
  arc A7 (-31.4383, 108.6012) -> (-42.4439, 103.226) centre (-29.5128, 90.7045) ccw projected
  arc A8 (-31.4383, 108.6012) -> (-39.7735, 119.4954) centre (-32.2967, 116.5802) ccw projected
  arc A9 (-58.8326, 99.2446) -> (-39.7735, 119.4954) centre (-74.411, 133.0005) ccw projected
  arc A10 (-58.8326, 99.2446) -> (-64.485, 93.5124) centre (-56.6793, 91.4683) ccw projected
  line L4 (-64.485, 93.5124) -> (-63.3797, 71.8578) projected
  circle A11 centre (-56.6451, 91.4352) radius 5.025 projected
  circle A12 centre (-32.2967, 116.5802) radius 5.025 projected
  line L5 (-52.3441, 88.8361) -> (-60.7158, 78.5186)
  line L6 (-60.7158, 78.5186) -> (-61.4624, 93.1463)
  arc A13 (-57.8274, 96.4055) -> (-61.4624, 93.1463) centre (-56.6793, 91.4683) ccw
  arc A14 (-57.8274, 96.4055) -> (-36.9785, 118.4056) centre (-74.411, 133.0005) ccw
  arc A15 (-31.7592, 111.584) -> (-36.9785, 118.4056) centre (-32.2967, 116.5802) ccw
  arc A16 (-31.7592, 111.584) -> (-44.5991, 105.3129) centre (-29.5128, 90.7045) ccw
  line L7 (-44.5991, 105.3129) -> (-45.7784, 104.095)
  arc A17 (-45.7784, 104.095) -> (-51.6331, 91.0599) centre (-30.6921, 89.4866) ccw
  arc A18 (-52.3441, 88.8361) -> (-51.6331, 91.0599) centre (-56.644, 91.4364) ccw
  point P0 (0, 0)
  point P1 (-57.1774, 82.8794)
  point P2 (-60.1206, 79.2521)
  dimension "d35" = 3
extrude "押し出し10" add sketch "スケッチ12" against normal blind 3 contours L5 A2 L1 A3
fillet "フィレット7" radius 1 2 edges at (-60.1206, 79.2521, 1.75) (-57.1774, 82.8794, 1.75)
sketch "スケッチ13" plane through (0, 0, 3) normal (0, 0, 1) x (1, 0, 0)
  arc A0 (-57.8834, 82.0093) -> (-58.4365, 83.6142) centre (-58.6599, 82.6394) ccw projected
  line L0 (-57.8834, 82.0093) -> (-59.0734, 80.5427) projected
  arc A1 (-60.8486, 81.1218) -> (-59.0734, 80.5427) centre (-59.8499, 81.1728) ccw projected
  line L1 (-60.8486, 81.1218) -> (-60.9438, 82.9858) projected
  arc A2 (-59.5793, 83.9675) -> (-60.9438, 82.9858) centre (-59.9451, 83.0368) ccw projected
  arc A3 (-59.5793, 83.9675) -> (-58.4365, 83.6142) centre (-56.644, 91.4364) ccw projected
  arc A4 (-63.3797, 71.8578) -> (-62.4921, 71.5682) centre (-62.8803, 71.8833) ccw projected
  line L2 (-62.4921, 71.5682) -> (-49.8994, 87.0877) projected
  arc A5 (-49.8994, 87.0877) -> (-48.6415, 90.8352) centre (-56.644, 91.4364) ccw projected
  arc A6 (-43.6232, 102.0081) -> (-48.6415, 90.8352) centre (-30.6921, 89.4866) ccw projected
  line L3 (-43.6232, 102.0081) -> (-42.4439, 103.226) projected
  arc A7 (-31.4383, 108.6012) -> (-42.4439, 103.226) centre (-29.5128, 90.7045) ccw projected
  arc A8 (-31.4383, 108.6012) -> (-39.7735, 119.4954) centre (-32.2967, 116.5802) ccw projected
  arc A9 (-58.8326, 99.2446) -> (-39.7735, 119.4954) centre (-74.411, 133.0005) ccw projected
  arc A10 (-58.8326, 99.2446) -> (-64.485, 93.5124) centre (-56.6793, 91.4683) ccw projected
  line L4 (-64.485, 93.5124) -> (-63.3797, 71.8578) projected
  circle A11 centre (-56.6451, 91.4352) radius 5.025 projected
  circle A12 centre (-32.2967, 116.5802) radius 5.025 projected
  circle A13 centre (-56.6451, 91.4352) radius 7.5
  point P0 (0, 0)
  dimension "d39" = 15
extrude "押し出し11" cut sketch "スケッチ13" against normal blind 1 contours A13
properties part number "アーム 揺動節" material "アルミニウム 7075"
